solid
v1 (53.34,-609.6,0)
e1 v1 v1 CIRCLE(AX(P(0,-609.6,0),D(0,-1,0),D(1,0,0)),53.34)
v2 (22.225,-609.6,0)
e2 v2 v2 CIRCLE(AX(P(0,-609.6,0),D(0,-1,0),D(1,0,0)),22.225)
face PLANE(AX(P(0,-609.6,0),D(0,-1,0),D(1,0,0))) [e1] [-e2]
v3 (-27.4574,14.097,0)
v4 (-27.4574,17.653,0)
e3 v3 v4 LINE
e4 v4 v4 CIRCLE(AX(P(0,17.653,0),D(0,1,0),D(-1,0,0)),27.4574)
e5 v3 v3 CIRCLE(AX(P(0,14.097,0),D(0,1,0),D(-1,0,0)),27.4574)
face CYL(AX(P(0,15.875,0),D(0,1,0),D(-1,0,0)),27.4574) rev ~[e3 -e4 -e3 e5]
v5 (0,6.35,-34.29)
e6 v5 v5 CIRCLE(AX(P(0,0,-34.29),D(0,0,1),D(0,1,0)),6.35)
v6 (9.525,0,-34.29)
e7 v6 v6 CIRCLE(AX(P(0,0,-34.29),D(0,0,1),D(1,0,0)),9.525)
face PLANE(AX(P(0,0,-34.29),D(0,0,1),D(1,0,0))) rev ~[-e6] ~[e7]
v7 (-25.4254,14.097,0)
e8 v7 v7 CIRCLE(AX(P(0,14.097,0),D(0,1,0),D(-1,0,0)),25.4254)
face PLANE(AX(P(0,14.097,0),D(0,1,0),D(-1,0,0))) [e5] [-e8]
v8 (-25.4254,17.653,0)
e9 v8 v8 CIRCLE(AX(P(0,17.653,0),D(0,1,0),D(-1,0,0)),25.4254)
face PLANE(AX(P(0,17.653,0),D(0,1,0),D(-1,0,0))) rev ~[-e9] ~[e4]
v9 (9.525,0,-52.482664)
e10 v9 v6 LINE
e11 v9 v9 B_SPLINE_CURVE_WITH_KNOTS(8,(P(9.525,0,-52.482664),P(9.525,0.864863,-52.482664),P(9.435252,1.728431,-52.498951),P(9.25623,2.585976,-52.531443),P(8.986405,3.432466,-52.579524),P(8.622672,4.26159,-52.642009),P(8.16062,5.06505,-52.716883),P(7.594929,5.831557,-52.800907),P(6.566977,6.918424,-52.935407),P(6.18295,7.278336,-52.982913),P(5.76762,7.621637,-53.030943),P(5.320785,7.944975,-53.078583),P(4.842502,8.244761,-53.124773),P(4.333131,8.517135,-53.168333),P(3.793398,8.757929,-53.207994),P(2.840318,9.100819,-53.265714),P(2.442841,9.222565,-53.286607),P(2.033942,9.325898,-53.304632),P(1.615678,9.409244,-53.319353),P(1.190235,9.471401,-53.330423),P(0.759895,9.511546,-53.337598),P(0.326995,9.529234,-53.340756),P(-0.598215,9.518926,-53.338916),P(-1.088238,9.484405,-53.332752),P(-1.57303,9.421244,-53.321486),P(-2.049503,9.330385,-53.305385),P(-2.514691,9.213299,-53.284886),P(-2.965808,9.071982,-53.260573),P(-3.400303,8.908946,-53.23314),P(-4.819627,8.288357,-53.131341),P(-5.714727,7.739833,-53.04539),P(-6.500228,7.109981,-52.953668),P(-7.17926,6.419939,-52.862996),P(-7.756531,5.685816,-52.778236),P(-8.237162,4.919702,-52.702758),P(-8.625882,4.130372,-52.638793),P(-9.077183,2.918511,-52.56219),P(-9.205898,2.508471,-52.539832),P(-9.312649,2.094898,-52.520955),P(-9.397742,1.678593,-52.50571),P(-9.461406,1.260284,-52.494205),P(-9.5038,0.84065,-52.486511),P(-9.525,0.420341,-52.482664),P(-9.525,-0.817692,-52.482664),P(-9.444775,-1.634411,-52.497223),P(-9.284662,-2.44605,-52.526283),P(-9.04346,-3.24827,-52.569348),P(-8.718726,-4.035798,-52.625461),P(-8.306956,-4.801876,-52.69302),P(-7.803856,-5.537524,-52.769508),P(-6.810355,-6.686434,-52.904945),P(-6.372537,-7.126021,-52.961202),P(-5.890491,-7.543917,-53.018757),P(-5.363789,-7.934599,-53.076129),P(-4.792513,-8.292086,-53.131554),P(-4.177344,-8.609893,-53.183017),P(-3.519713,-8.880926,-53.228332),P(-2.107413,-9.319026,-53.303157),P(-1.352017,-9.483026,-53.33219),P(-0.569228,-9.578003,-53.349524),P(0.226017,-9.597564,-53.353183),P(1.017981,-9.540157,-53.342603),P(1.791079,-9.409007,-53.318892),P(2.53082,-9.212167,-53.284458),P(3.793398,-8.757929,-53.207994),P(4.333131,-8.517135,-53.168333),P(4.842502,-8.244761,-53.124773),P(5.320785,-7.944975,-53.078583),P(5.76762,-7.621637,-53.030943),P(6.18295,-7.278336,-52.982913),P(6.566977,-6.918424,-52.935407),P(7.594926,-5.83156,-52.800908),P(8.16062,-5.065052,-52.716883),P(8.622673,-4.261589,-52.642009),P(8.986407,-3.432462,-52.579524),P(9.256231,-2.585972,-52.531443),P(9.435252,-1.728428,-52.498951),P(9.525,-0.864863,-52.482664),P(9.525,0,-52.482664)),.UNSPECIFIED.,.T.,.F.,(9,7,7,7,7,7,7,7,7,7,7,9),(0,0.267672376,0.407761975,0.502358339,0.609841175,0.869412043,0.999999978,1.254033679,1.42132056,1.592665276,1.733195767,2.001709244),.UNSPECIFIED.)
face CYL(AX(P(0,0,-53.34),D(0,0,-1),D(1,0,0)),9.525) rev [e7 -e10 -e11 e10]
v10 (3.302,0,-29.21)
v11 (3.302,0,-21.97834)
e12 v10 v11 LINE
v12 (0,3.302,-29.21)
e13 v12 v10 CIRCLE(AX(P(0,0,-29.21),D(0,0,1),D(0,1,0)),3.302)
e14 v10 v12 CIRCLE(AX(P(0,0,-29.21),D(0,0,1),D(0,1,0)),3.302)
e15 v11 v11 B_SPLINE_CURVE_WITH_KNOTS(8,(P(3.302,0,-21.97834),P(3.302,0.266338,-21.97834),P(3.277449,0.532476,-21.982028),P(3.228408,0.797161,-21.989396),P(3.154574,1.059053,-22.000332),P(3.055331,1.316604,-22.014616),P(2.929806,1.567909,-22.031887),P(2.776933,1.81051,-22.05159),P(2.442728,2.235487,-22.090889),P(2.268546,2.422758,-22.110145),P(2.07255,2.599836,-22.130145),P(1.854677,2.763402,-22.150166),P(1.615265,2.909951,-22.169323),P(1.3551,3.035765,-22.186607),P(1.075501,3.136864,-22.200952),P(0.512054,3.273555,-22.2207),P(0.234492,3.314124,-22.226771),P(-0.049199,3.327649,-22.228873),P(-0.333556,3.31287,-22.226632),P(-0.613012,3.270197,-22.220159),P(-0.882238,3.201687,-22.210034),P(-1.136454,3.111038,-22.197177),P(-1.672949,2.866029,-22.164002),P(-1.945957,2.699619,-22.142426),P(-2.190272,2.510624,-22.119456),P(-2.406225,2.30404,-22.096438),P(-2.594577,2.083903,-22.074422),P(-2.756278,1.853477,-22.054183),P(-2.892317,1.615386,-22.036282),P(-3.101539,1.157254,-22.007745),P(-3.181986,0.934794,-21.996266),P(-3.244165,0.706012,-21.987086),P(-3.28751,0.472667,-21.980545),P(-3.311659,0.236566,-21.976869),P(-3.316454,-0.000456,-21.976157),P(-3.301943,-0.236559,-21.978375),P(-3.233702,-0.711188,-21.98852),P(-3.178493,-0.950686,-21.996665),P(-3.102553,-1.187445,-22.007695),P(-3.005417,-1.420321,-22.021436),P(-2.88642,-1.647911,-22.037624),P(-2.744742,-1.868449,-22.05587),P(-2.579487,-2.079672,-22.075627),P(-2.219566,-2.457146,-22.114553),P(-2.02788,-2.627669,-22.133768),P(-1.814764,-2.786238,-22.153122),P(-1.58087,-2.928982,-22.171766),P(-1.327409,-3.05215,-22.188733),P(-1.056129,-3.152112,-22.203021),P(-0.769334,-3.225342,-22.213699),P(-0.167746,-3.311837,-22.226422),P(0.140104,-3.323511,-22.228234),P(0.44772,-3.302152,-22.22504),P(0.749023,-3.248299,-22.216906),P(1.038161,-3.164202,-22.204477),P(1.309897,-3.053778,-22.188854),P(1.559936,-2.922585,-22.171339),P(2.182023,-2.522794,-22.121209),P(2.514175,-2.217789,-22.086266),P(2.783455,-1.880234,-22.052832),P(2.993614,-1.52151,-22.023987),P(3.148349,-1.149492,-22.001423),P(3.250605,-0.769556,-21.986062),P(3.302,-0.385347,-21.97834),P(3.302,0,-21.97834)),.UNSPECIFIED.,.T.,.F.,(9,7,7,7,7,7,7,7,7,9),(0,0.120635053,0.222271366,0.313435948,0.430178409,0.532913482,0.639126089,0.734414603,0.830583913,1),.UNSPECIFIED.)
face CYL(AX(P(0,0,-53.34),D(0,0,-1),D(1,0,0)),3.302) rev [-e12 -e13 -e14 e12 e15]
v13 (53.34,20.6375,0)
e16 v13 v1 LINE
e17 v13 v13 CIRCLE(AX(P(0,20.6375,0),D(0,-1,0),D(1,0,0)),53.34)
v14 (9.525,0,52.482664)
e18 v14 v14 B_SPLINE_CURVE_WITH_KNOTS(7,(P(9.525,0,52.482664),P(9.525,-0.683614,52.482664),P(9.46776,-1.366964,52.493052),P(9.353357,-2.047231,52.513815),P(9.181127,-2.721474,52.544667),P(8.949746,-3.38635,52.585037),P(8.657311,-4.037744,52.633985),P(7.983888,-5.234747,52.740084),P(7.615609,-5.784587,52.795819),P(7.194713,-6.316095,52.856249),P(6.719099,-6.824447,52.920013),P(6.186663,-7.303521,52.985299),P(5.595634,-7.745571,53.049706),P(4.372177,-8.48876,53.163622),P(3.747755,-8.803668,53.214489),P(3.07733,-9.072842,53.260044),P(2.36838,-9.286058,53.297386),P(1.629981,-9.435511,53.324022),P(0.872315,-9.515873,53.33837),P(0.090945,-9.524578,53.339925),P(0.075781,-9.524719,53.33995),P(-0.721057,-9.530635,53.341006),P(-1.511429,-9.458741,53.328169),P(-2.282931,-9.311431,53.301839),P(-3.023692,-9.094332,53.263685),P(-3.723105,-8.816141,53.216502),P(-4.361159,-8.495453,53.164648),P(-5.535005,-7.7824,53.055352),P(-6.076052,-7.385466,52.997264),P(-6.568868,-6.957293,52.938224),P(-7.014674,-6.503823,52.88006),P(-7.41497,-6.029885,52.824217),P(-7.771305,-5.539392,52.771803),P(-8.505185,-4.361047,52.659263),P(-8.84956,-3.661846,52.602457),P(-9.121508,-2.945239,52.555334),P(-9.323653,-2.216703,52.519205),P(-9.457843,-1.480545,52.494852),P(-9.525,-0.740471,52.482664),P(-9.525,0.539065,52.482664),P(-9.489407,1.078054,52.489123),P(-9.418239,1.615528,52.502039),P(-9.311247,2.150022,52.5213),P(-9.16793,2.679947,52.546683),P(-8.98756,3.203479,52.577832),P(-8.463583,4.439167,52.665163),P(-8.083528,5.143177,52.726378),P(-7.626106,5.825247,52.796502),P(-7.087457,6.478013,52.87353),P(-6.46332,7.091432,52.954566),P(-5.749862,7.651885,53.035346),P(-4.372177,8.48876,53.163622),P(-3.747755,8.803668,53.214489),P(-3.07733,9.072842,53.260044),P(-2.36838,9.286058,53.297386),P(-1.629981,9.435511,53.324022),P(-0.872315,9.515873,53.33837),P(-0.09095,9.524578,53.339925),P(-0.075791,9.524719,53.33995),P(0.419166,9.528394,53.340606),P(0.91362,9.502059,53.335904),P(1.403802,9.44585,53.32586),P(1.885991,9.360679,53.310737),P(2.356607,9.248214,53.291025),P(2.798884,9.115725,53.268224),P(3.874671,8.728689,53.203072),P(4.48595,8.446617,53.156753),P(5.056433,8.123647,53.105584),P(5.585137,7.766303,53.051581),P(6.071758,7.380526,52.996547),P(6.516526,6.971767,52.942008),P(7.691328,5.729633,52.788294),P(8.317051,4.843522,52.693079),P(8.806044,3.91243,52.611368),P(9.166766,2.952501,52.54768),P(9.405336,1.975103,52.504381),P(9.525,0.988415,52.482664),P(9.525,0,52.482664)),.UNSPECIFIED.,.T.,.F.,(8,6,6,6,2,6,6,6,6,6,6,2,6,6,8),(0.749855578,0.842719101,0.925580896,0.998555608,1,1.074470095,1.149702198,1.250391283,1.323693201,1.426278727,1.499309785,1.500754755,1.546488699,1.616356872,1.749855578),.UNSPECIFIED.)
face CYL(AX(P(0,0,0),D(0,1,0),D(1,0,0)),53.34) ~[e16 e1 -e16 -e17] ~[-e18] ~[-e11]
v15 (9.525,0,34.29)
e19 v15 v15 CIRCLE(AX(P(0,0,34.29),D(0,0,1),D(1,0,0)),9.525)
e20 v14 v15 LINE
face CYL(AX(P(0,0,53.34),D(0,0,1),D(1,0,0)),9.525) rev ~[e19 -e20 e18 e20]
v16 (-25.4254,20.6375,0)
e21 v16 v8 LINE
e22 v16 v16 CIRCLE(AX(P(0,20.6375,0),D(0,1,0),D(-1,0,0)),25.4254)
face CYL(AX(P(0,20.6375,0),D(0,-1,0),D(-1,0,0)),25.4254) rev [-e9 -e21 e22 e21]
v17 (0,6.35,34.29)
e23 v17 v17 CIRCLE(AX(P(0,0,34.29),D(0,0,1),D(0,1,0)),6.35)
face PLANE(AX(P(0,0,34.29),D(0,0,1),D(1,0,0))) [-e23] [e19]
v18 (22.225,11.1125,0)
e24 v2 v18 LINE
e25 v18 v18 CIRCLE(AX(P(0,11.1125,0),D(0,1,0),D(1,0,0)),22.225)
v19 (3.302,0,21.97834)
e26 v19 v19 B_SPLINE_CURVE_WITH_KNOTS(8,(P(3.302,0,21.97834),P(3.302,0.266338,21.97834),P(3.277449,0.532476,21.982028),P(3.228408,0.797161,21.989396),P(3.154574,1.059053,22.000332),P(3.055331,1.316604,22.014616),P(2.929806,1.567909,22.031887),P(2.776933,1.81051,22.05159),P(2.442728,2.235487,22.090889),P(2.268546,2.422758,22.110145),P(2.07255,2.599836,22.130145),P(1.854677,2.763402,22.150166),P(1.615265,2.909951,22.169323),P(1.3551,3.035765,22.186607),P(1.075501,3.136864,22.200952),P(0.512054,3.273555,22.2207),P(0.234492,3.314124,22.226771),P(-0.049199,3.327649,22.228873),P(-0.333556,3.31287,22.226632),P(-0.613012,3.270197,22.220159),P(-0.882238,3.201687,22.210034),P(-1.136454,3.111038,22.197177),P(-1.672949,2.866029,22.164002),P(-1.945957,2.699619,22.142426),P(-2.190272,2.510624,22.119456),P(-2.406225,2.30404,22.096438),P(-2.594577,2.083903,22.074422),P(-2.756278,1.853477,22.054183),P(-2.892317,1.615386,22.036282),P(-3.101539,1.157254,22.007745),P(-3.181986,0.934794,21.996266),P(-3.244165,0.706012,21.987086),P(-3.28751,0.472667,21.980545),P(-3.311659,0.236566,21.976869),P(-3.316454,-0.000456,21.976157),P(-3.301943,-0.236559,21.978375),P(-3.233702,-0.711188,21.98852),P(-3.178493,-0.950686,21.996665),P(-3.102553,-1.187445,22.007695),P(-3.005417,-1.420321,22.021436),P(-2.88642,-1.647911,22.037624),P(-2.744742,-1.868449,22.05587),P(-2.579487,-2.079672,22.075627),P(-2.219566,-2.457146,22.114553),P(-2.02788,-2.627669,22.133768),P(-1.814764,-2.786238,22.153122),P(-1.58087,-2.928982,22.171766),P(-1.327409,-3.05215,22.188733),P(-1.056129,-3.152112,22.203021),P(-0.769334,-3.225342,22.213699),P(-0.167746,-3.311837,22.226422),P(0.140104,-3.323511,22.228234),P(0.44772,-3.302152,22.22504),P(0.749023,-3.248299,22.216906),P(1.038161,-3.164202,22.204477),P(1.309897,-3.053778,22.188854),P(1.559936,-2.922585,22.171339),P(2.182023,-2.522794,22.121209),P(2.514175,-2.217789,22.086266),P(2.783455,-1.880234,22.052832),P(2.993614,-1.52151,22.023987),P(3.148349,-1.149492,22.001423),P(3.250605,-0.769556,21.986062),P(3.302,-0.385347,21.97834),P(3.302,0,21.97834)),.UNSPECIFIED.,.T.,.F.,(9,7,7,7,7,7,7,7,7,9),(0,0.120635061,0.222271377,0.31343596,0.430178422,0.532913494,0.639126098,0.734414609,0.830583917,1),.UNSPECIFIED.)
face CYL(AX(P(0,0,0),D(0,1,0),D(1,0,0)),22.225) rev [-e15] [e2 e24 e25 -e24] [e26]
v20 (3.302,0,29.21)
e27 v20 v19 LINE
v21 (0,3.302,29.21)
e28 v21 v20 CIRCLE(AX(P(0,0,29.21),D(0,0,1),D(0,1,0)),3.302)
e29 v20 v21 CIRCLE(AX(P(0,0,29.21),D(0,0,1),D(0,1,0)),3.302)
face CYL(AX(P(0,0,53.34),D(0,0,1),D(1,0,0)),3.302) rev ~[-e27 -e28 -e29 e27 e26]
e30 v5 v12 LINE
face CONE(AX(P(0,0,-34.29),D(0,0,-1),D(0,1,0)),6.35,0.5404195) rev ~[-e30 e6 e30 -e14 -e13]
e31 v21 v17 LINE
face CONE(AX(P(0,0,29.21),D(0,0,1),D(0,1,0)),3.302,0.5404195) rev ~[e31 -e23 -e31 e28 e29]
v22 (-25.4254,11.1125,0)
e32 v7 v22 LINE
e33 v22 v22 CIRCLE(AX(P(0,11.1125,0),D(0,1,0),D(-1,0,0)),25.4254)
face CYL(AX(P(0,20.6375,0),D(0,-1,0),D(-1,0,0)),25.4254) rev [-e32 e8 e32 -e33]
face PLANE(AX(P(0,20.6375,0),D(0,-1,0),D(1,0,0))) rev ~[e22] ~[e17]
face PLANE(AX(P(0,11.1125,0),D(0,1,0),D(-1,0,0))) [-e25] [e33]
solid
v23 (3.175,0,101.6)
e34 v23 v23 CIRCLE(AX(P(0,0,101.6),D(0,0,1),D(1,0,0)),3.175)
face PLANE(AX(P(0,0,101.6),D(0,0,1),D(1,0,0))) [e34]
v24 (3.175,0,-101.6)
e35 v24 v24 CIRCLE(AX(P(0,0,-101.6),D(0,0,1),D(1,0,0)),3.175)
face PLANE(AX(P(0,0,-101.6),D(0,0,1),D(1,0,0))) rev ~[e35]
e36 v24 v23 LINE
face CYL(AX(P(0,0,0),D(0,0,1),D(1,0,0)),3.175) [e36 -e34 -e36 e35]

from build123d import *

# Parameters (mm, degrees)
F0_R      = 53.34
F0_R_2    = 22.225
F1_DEPTH  = 20.6375
F6_DEPTH  = 609.6
F5_R      = 9.525
F5_R_2    = 3.302
F7_DEPTH  = 19.05
F8_DEPTH  = 32.3616602869
F4_R      = 9.525
F4_R_2    = 3.302
F9_DEPTH  = 19.05
F10_DEPTH = 32.3616602869
F13_W     = 2.032
F13_H     = 3.556
F15_R     = 3.175
F16_DEPTH = 101.6


# Not quite as in the source:
# - the program builds the solid bodies; features that only make, move or delete a surface that nothing else refers to are left out


with BuildPart() as f1:
    # F0 (on Front) → F1 (new body)
    with BuildSketch(Plane.XZ):
        Circle(F0_R)
        Circle(F0_R_2, mode=Mode.SUBTRACT)
    extrude(amount=-F1_DEPTH)

    # F0 (on Front) → F6 (join)
    with BuildSketch(Plane.XZ):
        Circle(F0_R)
        Circle(F0_R_2, mode=Mode.SUBTRACT)
    extrude(amount=F6_DEPTH)

    # F5 (on offset) → F7 (cut)
    with BuildSketch(Plane.XY.offset(-53.34)):
        Circle(F5_R)
        Circle(F5_R_2, mode=Mode.SUBTRACT)
        Circle(F5_R_2)
    extrude(amount=F7_DEPTH, mode=Mode.SUBTRACT)

    # F5 (on offset) → F8 (cut, up to face)
    with BuildSketch(Plane.XY.offset(-53.34)):
        Circle(F5_R_2)
    extrude(amount=F8_DEPTH, mode=Mode.SUBTRACT)

    # F4 (on offset) → F9 (cut)
    with BuildSketch(Plane.XY.offset(53.34)):
        Circle(F4_R)
        Circle(F4_R_2, mode=Mode.SUBTRACT)
        Circle(F4_R_2)
    extrude(amount=-F9_DEPTH, mode=Mode.SUBTRACT)

    # F4 (on offset) → F10 (cut, up to face)
    with BuildSketch(Plane.XY.offset(53.34)):
        Circle(F4_R_2)
    extrude(amount=-F10_DEPTH, mode=Mode.SUBTRACT)

    # F11 (on Right) → F12 (revolve, cut)
    with BuildSketch(Plane.YZ):
        Polygon((6.35, 34.29), (3.302, 34.29), (3.302, 29.21), align=None)
        Polygon((3.302, -29.21), (3.302, -34.29), (6.35, -34.29), align=None)
    revolve(axis=Axis((0, 0, 6.9711627439), (0, 0, 1)), mode=Mode.SUBTRACT)

    # F13 (on Top) → F14 (revolve, cut)
    with BuildSketch(Plane.XY):
        Polygon((-25.4254, 11.1125), (-22.225, 11.1125), (-22.225, 20.6375), (-25.4254, 20.6375), (-25.4254, 17.653), (-25.4254, 14.097), align=None)
        with Locations((-26.4414, 15.875)):
            Rectangle(F13_W, F13_H)
    revolve(axis=Axis((0, 5.55625, 0), (0, 1, 0)), mode=Mode.SUBTRACT)


with BuildPart() as f16:
    # F15 (on Top) → F16 (new body, symmetric)
    with BuildSketch(Plane.XY):
        Circle(F15_R)
    extrude(amount=F16_DEPTH, both=True)


solid = Compound([f1.part, f16.part])
